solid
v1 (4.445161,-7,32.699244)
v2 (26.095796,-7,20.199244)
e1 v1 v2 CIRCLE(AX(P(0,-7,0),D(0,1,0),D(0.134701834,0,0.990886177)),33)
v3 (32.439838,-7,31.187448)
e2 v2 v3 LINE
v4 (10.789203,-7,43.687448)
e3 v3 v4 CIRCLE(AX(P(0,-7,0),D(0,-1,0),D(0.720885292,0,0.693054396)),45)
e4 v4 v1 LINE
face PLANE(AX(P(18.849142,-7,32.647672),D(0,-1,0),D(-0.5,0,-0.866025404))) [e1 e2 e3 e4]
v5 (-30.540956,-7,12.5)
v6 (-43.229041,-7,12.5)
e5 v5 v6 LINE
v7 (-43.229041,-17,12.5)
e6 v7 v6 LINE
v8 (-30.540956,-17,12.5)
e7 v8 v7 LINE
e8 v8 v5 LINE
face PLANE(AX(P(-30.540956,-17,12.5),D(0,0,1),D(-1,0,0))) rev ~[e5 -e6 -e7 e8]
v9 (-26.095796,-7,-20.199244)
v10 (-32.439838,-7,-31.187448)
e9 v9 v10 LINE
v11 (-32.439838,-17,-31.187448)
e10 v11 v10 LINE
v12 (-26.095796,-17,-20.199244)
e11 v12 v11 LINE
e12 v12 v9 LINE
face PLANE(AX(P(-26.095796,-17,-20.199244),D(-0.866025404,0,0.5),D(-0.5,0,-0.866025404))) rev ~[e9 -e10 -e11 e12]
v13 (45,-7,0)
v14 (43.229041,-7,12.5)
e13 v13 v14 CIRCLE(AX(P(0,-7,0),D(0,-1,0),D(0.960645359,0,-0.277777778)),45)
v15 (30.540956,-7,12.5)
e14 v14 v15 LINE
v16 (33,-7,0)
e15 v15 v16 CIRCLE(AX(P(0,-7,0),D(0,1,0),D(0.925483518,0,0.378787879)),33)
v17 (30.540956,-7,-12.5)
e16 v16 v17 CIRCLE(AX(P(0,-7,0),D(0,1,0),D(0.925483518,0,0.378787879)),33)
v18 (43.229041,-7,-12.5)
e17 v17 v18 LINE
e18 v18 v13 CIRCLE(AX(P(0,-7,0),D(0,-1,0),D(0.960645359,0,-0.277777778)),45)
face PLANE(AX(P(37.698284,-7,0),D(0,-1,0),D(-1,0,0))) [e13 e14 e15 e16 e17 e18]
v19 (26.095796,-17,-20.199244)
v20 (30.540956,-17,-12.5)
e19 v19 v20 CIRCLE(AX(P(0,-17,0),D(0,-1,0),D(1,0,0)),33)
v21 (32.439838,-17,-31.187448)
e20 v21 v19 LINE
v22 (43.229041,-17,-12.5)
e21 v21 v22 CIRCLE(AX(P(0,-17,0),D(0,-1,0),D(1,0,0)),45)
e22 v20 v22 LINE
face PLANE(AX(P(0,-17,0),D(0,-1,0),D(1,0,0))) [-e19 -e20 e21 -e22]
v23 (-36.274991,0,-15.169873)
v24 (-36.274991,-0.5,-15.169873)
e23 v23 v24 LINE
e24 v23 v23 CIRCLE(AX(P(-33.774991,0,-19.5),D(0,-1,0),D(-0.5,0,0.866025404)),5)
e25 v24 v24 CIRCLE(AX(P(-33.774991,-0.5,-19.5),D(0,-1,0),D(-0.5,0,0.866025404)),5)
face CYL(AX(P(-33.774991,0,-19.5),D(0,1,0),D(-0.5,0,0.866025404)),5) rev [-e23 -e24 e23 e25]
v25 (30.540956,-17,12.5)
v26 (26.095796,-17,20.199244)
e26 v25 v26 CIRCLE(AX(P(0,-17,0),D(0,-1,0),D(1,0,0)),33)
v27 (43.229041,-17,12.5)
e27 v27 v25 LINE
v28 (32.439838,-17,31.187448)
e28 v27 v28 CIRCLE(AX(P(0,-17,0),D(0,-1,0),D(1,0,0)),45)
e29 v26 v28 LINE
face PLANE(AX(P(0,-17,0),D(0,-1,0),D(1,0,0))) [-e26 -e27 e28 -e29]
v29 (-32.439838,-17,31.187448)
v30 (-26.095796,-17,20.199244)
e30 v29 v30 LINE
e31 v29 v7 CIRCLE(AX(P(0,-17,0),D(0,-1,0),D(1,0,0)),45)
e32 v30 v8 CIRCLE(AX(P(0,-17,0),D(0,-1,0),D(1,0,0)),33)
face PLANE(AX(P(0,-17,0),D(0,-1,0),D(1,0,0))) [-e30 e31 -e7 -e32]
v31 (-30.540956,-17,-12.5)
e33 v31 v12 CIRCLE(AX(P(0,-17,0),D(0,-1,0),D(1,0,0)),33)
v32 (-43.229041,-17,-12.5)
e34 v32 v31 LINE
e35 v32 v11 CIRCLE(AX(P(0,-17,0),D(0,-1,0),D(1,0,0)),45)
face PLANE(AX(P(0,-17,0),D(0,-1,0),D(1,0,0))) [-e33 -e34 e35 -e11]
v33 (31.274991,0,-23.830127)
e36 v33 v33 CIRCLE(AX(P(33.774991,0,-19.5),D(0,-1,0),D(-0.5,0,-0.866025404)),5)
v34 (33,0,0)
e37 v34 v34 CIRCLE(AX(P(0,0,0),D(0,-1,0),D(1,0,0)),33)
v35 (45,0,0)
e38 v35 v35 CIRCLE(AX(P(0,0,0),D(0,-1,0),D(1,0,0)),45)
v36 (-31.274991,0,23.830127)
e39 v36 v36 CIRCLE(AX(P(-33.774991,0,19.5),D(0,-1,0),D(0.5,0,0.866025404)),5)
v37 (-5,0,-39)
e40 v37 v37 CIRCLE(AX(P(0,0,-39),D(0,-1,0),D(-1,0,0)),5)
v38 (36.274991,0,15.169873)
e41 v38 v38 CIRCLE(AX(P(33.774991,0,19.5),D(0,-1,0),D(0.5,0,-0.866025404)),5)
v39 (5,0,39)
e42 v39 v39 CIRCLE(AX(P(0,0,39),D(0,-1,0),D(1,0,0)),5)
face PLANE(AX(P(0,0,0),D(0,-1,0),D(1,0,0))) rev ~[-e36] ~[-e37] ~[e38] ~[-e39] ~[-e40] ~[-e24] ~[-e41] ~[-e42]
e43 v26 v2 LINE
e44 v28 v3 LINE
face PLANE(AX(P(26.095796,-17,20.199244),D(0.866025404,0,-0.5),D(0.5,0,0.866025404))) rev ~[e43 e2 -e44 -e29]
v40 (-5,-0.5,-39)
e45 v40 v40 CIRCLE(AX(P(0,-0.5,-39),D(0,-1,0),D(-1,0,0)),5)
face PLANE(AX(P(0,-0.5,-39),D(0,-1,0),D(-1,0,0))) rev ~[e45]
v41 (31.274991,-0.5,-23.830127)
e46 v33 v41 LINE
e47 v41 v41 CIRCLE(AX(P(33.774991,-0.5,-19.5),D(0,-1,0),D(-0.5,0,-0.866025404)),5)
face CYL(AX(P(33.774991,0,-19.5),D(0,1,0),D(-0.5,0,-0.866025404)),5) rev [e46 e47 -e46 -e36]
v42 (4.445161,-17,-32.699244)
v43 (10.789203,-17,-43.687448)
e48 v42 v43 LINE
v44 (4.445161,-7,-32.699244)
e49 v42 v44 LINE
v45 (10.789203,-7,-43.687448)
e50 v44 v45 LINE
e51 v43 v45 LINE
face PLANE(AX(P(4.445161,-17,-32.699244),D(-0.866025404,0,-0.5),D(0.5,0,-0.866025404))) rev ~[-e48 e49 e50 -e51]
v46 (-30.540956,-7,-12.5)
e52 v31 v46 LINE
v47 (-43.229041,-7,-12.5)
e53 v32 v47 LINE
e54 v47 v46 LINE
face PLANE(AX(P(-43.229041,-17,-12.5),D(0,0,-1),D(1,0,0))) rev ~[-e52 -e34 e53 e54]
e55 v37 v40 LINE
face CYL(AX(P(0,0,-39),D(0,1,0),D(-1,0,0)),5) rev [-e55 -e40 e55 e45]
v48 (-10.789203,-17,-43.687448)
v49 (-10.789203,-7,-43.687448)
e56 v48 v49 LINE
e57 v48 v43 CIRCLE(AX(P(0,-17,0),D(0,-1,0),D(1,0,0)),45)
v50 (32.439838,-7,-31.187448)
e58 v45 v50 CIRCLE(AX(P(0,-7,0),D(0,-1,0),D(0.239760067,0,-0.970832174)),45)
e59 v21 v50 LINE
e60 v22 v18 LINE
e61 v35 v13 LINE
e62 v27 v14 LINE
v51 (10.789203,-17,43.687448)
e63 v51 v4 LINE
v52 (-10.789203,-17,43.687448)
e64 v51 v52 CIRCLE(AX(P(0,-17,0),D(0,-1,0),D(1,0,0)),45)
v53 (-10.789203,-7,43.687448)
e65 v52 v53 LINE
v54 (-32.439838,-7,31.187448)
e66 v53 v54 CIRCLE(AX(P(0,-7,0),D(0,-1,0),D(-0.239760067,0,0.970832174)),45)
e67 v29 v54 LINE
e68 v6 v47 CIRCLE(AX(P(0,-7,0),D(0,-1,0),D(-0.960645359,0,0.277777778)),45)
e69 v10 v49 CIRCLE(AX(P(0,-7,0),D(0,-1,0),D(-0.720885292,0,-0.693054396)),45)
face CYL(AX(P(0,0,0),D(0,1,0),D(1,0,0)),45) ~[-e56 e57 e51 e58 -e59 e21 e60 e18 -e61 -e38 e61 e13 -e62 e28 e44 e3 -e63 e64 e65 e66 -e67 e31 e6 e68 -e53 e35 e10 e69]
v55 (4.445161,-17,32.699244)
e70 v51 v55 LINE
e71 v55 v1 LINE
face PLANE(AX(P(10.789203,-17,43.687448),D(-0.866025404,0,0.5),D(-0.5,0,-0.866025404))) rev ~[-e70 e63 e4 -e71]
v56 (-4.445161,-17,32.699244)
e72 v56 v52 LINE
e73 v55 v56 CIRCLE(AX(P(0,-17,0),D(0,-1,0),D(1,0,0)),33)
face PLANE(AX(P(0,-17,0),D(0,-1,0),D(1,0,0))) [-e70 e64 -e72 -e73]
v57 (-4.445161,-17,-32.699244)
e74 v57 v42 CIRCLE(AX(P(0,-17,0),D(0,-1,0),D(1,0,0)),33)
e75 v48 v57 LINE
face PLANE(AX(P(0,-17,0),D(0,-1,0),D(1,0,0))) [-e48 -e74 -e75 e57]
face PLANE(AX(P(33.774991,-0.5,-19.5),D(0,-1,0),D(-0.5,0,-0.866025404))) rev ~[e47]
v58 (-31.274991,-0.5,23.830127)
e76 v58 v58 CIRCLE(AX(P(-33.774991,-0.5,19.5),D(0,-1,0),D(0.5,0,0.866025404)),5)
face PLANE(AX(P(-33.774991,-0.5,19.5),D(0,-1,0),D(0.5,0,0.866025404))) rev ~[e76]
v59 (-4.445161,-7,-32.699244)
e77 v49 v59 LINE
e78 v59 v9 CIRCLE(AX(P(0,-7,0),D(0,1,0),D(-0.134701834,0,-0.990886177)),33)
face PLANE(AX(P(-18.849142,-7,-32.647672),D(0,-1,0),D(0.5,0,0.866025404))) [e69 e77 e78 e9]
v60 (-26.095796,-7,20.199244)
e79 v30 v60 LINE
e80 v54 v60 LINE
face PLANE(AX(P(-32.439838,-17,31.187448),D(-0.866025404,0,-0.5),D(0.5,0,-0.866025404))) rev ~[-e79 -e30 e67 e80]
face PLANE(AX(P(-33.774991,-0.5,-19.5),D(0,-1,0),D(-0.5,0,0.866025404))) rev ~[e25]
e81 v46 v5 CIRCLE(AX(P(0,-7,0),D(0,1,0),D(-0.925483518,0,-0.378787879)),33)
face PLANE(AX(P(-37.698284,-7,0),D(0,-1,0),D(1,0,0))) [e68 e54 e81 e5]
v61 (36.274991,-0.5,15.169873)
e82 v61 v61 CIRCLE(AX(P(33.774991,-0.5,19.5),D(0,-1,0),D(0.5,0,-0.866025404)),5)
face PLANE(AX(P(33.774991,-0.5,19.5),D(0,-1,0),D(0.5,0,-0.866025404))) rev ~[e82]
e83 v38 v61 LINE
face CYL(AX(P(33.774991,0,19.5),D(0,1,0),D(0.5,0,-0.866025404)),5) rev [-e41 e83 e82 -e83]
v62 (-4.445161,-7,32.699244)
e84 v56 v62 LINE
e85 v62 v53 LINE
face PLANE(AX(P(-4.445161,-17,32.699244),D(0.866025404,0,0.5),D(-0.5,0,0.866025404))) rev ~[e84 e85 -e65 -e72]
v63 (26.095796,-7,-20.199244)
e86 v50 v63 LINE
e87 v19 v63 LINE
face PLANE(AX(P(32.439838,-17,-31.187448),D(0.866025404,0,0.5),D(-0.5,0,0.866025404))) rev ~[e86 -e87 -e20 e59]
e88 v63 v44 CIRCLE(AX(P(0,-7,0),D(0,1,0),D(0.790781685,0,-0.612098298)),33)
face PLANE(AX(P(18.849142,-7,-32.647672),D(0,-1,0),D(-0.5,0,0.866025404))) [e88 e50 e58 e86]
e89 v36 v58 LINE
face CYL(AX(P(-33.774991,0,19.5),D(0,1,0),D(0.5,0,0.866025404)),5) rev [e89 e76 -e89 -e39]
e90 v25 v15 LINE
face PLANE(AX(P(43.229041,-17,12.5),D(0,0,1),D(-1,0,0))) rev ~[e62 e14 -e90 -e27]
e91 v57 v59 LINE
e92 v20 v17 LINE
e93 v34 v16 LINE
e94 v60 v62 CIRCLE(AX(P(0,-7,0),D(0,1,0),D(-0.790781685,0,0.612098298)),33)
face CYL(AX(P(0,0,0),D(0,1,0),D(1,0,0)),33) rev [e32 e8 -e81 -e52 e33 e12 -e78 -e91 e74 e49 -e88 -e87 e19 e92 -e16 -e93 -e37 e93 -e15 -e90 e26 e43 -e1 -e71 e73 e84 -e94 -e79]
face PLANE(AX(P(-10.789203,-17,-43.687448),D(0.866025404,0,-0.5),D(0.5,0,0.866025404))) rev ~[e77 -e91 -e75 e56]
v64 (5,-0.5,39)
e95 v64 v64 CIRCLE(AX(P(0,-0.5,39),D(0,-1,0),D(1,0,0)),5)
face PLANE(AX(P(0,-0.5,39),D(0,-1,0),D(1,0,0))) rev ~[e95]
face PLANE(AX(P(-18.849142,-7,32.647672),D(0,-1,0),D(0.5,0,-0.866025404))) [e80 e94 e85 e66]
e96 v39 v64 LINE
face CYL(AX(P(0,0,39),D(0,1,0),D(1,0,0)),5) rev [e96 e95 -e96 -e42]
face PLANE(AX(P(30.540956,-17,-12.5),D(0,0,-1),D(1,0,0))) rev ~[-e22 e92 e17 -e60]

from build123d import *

# Parameters (mm, degrees)
F0_R            = 45
F0_R_2          = 33
F1_DEPTH        = 17
F2_R            = 5
F3_DEPTH        = 0.5
F3_COPIES_COUNT = 6
F6_DEPTH        = 10
F8_COUNT        = 6


# Not quite as in the source:
# - a pattern or mirror of a feature is missing from the dataset's text; its kind, count and spacing are read off the source's solid


with BuildPart() as f1:
    # F0 (on Front) → F1 (new body)
    with BuildSketch(Plane.XZ):
        Circle(F0_R)
        Circle(F0_R_2, mode=Mode.SUBTRACT)
    extrude(amount=F1_DEPTH)

    # F2 (on Front) → F3 (cut)
    with BuildSketch(Plane.XZ):
        with Locations((0, 39)):
            Circle(F2_R)
    f3 = extrude(amount=F3_DEPTH, mode=Mode.SUBTRACT)

    # F3_copies: F3 ×6 about axis
    f3_copies_axis = Axis((0, 0, 0), (0, 1, 0))
    for i in range(1, F3_COPIES_COUNT):
        add(f3.rotate(f3_copies_axis, i * 360 / F3_COPIES_COUNT), mode=Mode.SUBTRACT)

    # F5 (on face) → F6 (cut)
    with BuildSketch(Plane.XZ.offset(17)):
        with BuildLine():
            Line((-30.5409561082, 12.5), (-43.2290411645, 12.5))
            ThreePointArc((-43.2290411645, 12.5), (-45, 0), (-43.2290411645, -12.5))
            Line((-43.2290411645, -12.5), (-30.5409561082, -12.5))
            ThreePointArc((-30.5409561082, -12.5), (-33, 0), (-30.5409561082, 12.5))
        make_face()
    f6 = extrude(amount=-F6_DEPTH, mode=Mode.SUBTRACT)

    # F8: F6 ×6 about axis
    f8_axis = Axis((0, -20.116, 0), (0, -1, 0))
    for i in range(1, F8_COUNT):
        add(f6.rotate(f8_axis, i * 360 / F8_COUNT), mode=Mode.SUBTRACT)


solid = f1.part
